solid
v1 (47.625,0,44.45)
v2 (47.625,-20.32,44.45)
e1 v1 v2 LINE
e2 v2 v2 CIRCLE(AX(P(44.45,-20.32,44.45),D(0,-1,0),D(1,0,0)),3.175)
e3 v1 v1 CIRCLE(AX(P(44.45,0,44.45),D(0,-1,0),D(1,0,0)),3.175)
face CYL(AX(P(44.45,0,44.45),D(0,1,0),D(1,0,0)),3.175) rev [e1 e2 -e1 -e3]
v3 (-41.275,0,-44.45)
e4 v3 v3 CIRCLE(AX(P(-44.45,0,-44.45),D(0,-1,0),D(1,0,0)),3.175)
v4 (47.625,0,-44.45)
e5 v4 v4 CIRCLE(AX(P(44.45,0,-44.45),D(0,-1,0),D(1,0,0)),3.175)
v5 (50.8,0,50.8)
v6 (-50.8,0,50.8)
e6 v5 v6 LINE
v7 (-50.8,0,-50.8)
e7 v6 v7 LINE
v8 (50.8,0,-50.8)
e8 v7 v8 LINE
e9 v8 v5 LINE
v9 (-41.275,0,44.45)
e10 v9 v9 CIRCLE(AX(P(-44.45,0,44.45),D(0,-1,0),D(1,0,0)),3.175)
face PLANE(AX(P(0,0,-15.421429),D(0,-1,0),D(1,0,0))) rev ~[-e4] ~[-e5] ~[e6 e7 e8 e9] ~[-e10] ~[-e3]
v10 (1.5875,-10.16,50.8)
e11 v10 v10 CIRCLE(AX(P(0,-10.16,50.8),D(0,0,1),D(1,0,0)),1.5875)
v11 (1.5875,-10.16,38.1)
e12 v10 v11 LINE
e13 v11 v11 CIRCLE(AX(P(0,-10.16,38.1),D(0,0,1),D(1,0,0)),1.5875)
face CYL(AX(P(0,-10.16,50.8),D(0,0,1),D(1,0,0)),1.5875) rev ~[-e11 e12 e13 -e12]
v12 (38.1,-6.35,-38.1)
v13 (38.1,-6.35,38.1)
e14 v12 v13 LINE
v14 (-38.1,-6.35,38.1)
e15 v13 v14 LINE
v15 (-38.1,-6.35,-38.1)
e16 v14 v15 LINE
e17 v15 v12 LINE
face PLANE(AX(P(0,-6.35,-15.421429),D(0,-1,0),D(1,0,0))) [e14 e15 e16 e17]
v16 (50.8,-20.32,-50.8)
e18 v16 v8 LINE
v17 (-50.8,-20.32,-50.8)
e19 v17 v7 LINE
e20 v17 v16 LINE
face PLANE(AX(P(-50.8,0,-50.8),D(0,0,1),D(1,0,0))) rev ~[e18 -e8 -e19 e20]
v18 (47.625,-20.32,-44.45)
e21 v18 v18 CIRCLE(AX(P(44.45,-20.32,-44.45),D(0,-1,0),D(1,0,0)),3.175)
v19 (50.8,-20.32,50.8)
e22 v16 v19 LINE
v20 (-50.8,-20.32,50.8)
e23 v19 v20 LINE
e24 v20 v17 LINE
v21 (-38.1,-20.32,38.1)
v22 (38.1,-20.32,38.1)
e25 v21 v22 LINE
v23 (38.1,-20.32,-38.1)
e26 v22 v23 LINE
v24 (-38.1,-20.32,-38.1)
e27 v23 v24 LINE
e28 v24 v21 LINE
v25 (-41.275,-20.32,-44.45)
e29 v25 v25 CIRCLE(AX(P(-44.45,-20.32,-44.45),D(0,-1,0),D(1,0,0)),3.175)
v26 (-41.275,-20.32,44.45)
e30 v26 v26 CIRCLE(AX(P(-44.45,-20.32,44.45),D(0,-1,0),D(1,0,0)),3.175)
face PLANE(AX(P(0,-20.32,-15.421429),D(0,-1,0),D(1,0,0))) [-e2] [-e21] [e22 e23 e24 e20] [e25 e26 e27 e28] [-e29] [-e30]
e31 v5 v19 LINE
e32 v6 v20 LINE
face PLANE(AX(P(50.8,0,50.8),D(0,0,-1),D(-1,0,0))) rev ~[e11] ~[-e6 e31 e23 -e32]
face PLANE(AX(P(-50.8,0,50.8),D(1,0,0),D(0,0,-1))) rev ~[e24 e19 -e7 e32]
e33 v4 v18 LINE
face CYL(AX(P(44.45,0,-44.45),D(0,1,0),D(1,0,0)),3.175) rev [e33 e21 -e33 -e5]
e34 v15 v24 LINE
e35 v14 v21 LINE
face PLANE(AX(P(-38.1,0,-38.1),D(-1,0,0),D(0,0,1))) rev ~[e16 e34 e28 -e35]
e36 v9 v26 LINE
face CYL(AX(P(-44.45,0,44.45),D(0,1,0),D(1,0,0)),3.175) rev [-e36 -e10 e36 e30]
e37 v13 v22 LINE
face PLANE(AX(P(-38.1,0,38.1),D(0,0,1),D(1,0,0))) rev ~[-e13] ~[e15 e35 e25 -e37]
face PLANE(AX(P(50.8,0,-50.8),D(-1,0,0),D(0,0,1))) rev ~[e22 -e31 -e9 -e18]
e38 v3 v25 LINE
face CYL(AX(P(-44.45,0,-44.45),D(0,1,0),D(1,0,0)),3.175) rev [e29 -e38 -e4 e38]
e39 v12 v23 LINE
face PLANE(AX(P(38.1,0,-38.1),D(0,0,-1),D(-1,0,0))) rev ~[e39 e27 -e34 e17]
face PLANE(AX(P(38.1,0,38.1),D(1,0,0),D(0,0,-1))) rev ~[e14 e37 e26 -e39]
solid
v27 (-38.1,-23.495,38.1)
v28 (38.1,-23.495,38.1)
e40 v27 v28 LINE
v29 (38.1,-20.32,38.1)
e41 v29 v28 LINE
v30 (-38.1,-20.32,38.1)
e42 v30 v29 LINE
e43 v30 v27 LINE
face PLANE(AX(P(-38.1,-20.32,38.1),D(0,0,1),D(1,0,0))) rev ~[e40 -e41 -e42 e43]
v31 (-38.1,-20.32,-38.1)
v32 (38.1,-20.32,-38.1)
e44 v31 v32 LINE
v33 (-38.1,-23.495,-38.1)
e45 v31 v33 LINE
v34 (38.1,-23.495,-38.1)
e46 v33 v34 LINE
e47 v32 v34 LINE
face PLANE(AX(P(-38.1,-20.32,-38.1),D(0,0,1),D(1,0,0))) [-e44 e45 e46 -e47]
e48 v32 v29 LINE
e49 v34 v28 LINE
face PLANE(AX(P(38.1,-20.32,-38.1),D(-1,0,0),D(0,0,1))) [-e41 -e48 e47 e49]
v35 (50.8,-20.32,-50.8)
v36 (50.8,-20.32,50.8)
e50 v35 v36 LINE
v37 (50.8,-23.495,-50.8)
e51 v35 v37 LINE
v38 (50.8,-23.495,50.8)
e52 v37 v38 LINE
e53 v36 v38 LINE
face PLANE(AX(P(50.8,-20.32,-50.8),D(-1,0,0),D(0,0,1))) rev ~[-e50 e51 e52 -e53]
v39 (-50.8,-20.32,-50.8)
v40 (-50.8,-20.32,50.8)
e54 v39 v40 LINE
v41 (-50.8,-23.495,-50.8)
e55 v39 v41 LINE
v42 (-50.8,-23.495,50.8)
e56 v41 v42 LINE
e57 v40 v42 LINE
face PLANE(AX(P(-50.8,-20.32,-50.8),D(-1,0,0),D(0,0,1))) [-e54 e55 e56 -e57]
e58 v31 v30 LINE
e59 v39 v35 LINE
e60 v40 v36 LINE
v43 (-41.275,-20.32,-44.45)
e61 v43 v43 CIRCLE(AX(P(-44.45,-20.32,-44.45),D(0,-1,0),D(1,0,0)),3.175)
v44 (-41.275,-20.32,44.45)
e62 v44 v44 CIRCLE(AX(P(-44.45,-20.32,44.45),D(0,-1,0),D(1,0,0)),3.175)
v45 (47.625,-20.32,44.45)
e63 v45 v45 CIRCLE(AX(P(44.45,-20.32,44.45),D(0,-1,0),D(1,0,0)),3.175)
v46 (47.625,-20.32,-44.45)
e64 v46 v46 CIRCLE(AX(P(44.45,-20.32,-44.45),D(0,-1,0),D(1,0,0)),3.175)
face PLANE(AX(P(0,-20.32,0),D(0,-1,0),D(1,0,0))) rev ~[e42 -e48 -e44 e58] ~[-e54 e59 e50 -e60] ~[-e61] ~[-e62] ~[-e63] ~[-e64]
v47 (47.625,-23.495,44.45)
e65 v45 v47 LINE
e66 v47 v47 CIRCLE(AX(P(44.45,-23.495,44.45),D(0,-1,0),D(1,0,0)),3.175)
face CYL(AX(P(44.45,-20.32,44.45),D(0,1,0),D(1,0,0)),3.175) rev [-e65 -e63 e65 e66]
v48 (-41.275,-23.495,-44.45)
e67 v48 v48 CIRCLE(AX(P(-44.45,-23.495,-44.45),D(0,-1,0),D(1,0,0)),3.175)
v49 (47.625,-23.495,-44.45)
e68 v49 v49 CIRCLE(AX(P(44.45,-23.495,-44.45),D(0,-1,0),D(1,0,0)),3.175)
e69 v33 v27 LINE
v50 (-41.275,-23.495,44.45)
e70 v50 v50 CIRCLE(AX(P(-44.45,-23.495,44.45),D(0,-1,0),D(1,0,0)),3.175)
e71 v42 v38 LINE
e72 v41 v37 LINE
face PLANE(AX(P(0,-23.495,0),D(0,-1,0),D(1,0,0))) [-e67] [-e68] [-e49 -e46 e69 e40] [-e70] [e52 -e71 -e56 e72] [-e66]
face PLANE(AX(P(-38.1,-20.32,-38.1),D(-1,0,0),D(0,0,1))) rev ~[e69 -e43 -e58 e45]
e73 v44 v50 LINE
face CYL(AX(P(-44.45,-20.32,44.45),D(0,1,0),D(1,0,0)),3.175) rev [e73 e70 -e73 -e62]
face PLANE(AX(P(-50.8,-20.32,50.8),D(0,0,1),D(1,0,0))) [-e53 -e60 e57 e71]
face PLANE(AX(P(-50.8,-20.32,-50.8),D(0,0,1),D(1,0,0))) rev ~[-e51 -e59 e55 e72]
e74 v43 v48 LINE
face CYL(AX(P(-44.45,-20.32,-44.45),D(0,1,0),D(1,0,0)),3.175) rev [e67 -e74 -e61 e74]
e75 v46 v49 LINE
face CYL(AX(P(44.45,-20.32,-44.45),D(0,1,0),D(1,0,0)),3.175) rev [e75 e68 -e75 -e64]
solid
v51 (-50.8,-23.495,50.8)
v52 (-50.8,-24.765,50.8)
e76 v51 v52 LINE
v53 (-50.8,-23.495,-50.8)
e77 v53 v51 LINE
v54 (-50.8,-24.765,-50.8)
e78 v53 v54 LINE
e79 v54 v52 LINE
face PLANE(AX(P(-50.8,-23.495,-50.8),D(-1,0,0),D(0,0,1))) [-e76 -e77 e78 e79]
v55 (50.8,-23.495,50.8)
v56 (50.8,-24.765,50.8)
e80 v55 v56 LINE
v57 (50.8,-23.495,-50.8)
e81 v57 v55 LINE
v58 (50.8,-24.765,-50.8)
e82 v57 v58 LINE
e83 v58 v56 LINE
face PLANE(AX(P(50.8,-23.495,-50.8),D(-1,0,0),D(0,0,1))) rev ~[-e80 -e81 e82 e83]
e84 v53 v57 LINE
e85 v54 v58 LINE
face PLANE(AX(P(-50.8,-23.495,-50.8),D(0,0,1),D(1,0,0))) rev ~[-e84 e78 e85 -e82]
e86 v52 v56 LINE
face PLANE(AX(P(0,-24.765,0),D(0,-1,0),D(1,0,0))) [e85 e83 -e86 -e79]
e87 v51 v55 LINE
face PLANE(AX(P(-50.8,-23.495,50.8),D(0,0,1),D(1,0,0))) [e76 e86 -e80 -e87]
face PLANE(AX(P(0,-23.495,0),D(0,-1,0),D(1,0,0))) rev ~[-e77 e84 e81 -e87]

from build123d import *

# Parameters (mm, degrees)
F0_R     = 3.175
F0_W     = 12.7
F0_H     = 12.7
F1_DEPTH = 6.35
F2_DEPTH = 20.32
F3_R     = 1.5875
F4_DEPTH = 25.4
F5_W     = 101.6
F5_H     = 101.6
F5_R     = 3.175
F5_W_2   = 76.2
F5_H_2   = 76.2
F6_DEPTH = 3.175
F7_W     = 101.6
F7_H     = 101.6
F7_R     = 3.175
F7_W_2   = 76.2
F7_H_2   = 76.2
F8_DEPTH = 1.27


# Not quite as in the source:
# - a feature names something its author has since deleted; it is built from what else it names


with BuildPart() as f1:
    # F0 (on Front) → F1 (new body)
    with BuildSketch(Plane.XZ):
        Polygon((38.1, 38.1), (38.1, 0), (38.1, -38.1), (-38.1, -38.1), (-38.1, 0), (-38.1, 38.1), (-50.8, 38.1), (-50.8, -50.8), (50.8, -50.8), (50.8, 38.1), align=None)
        with Locations((-44.45, -44.45)):
            Circle(F0_R, mode=Mode.SUBTRACT)
        with Locations((44.45, -44.45)):
            Circle(F0_R, mode=Mode.SUBTRACT)
        Polygon((38.1, -38.1), (38.1, 0), (38.1, 38.1), (0, 38.1), (-38.1, 38.1), (-38.1, 0), (-38.1, -38.1), align=None)
        Polygon((0, 38.1), (38.1, 38.1), (38.1, 50.8), (-38.1, 50.8), (-38.1, 38.1), align=None)
        with Locations((-44.45, 44.45)):
            Rectangle(F0_W, F0_H)
        with Locations((-44.45, 44.45)):
            Circle(F0_R, mode=Mode.SUBTRACT)
        with Locations((44.45, 44.45)):
            Rectangle(F0_W, F0_H)
        with Locations((44.45, 44.45)):
            Circle(F0_R, mode=Mode.SUBTRACT)
    extrude(amount=F1_DEPTH)

    # F0 (on Front) → F2 (join)
    with BuildSketch(Plane.XZ):
        Polygon((38.1, 38.1), (38.1, 0), (38.1, -38.1), (-38.1, -38.1), (-38.1, 0), (-38.1, 38.1), (-50.8, 38.1), (-50.8, -50.8), (50.8, -50.8), (50.8, 38.1), align=None)
        with Locations((-44.45, -44.45)):
            Circle(F0_R, mode=Mode.SUBTRACT)
        with Locations((44.45, -44.45)):
            Circle(F0_R, mode=Mode.SUBTRACT)
        Polygon((0, 38.1), (38.1, 38.1), (38.1, 50.8), (-38.1, 50.8), (-38.1, 38.1), align=None)
        with Locations((44.45, 44.45)):
            Rectangle(F0_W, F0_H)
        with Locations((44.45, 44.45)):
            Circle(F0_R, mode=Mode.SUBTRACT)
        with Locations((-44.45, 44.45)):
            Rectangle(F0_W, F0_H)
        with Locations((-44.45, 44.45)):
            Circle(F0_R, mode=Mode.SUBTRACT)
    extrude(amount=F2_DEPTH)

    # F3 (on face) → F4 (cut)
    with BuildSketch(Plane.XY.offset(50.8)):
        with Locations((0, -10.16)):
            Circle(F3_R)
    extrude(amount=-F4_DEPTH, mode=Mode.SUBTRACT)


with BuildPart() as f6:
    # F5 (on face) → F6 (new body)
    with BuildSketch(Plane.XZ.offset(20.32)):
        Rectangle(F5_W, F5_H)
        with Locations((-44.45, -44.45)):
            Circle(F5_R, mode=Mode.SUBTRACT)
        Rectangle(F5_W_2, F5_H_2, mode=Mode.SUBTRACT)
        with Locations((44.45, -44.45)):
            Circle(F5_R, mode=Mode.SUBTRACT)
        with Locations((-44.45, 44.45)):
            Circle(F5_R, mode=Mode.SUBTRACT)
        with Locations((44.45, 44.45)):
            Circle(F5_R, mode=Mode.SUBTRACT)
    extrude(amount=F6_DEPTH)


with BuildPart() as f8:
    # F7 (on face) → F8 (new body)
    with BuildSketch(Plane.XZ.offset(23.495)):
        Rectangle(F7_W, F7_H)
        with Locations((-44.45, -44.45)):
            Circle(F7_R, mode=Mode.SUBTRACT)
        Rectangle(F7_W_2, F7_H_2, mode=Mode.SUBTRACT)
        with Locations((44.45, -44.45)):
            Circle(F7_R, mode=Mode.SUBTRACT)
        with Locations((-44.45, 44.45)):
            Circle(F7_R, mode=Mode.SUBTRACT)
        with Locations((44.45, 44.45)):
            Circle(F7_R, mode=Mode.SUBTRACT)
        with Locations((-44.45, -44.45)):
            Circle(F7_R)
        Rectangle(F7_W_2, F7_H_2)
        with Locations((44.45, -44.45)):
            Circle(F7_R)
        with Locations((-44.45, 44.45)):
            Circle(F7_R)
        with Locations((44.45, 44.45)):
            Circle(F7_R)
    extrude(amount=F8_DEPTH)


solid = Compound([f1.part, f6.part, f8.part])
